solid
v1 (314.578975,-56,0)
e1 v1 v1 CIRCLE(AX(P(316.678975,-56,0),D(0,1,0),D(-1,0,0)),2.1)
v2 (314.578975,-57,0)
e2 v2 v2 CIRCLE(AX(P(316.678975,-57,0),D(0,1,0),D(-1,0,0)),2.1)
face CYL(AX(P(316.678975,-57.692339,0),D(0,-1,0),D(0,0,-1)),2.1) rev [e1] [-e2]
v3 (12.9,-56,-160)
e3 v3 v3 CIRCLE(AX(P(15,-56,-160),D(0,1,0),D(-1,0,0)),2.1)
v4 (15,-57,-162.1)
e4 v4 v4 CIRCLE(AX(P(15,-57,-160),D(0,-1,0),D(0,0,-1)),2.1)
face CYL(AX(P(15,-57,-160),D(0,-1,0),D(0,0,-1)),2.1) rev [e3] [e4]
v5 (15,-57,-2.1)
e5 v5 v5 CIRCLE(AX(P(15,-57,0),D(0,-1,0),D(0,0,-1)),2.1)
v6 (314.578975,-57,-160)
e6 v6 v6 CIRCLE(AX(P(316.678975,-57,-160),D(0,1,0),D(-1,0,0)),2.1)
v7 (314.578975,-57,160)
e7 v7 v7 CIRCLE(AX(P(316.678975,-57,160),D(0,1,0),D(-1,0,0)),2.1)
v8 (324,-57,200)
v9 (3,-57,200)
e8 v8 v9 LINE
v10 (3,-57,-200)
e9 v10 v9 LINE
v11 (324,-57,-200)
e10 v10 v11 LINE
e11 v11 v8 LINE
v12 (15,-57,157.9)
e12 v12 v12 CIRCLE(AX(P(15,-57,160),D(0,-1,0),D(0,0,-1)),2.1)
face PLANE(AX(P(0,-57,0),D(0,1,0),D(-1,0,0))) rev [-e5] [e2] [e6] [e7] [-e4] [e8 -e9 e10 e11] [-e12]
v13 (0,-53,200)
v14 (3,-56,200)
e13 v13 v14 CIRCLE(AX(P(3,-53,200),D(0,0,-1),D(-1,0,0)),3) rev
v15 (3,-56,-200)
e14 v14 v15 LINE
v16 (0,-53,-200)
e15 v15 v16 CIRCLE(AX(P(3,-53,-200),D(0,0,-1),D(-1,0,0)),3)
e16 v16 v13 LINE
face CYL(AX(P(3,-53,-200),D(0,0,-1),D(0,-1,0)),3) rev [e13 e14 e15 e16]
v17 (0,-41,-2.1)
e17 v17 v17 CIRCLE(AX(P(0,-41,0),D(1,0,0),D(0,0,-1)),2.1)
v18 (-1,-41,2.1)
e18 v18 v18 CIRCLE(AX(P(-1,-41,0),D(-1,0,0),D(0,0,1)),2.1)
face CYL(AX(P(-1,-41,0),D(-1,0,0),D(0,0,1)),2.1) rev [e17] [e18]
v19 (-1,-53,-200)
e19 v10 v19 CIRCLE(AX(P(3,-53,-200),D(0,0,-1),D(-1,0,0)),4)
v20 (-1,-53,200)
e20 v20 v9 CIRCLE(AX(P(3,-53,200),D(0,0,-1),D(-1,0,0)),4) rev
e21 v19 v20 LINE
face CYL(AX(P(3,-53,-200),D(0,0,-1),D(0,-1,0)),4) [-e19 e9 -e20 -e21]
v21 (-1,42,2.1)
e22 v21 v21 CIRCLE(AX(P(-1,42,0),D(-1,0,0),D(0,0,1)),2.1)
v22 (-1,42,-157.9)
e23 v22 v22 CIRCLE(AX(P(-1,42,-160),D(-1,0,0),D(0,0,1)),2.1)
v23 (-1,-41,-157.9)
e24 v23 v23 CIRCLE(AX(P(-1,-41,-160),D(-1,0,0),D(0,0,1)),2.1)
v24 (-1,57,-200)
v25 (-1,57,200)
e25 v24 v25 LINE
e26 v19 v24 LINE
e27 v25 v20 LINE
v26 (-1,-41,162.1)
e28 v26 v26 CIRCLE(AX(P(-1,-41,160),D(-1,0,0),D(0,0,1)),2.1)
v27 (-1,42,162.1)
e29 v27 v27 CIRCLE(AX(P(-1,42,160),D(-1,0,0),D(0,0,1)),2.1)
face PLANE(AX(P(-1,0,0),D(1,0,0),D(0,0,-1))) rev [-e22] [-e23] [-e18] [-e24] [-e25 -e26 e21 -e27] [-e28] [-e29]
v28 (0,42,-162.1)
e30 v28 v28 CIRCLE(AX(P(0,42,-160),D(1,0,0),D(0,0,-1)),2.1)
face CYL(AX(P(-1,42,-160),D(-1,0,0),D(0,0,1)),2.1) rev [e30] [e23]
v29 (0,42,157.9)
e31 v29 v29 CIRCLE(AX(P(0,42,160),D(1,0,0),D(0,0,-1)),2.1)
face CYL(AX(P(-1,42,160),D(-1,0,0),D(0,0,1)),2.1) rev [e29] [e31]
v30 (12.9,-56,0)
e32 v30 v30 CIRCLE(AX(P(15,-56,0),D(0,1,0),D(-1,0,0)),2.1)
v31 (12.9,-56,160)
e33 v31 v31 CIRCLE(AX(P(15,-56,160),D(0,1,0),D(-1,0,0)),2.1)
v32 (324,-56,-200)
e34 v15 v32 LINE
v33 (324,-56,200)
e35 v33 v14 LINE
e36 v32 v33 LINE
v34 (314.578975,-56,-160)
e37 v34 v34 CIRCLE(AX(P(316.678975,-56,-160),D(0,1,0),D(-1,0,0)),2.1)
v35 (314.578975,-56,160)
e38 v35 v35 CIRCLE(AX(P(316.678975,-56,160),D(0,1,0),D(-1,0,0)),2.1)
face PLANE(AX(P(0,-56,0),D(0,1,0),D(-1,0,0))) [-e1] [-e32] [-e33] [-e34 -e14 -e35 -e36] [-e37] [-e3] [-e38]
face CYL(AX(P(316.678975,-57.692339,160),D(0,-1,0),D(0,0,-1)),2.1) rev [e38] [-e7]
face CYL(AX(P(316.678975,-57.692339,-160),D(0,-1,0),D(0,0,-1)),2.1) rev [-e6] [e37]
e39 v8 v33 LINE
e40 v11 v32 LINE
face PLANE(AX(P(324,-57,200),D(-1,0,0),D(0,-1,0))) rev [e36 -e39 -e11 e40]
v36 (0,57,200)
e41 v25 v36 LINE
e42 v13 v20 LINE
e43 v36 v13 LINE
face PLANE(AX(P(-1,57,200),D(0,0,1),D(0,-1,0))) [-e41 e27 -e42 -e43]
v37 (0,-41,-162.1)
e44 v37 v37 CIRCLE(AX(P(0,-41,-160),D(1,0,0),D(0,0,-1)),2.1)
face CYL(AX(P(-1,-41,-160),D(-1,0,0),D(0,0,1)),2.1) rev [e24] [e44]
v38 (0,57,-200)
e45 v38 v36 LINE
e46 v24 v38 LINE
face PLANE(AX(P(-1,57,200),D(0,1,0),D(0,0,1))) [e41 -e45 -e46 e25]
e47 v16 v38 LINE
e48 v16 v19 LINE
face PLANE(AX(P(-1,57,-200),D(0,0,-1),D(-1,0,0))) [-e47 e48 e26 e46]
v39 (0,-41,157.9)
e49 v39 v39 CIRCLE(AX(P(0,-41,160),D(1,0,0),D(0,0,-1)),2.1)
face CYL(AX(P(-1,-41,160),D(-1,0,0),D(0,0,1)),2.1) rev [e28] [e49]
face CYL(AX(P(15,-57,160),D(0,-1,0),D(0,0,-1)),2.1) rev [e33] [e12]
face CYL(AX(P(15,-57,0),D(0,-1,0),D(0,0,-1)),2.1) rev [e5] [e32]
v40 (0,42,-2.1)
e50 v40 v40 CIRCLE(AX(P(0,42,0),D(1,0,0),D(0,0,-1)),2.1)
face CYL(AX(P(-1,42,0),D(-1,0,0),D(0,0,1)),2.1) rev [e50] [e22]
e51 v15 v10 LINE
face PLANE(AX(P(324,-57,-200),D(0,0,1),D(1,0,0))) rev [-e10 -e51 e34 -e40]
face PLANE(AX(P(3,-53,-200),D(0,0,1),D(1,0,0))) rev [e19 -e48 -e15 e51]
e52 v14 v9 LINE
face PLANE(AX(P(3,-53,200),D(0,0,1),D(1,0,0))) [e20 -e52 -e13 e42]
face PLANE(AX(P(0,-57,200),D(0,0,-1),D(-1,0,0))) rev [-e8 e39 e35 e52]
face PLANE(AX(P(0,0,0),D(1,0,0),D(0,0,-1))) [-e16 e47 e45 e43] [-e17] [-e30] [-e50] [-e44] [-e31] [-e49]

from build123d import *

# Parameters (mm, degrees)
SKETCH1_W                            = 400
SKETCH1_H                            = 114
BASE_FLANGE1_DEPTH                   = 1
EDGE_FLANGE1_STRIP_W                 = 10
EDGE_FLANGE1_STRIP_H                 = 1
EDGE_FLANGE1_STRIP_CUT_DEPTH         = 400
EDGE_FLANGE1_DEPTH                   = 400
F_4_2_START                          = -57
F_4_2_4_2_DIAMETER_HOLE1_OUTLINE_R   = 2.1
F_4_2_4_2_DIAMETER_HOLE1_DEPTH       = 1
F_4_2_START_2                        = -1
F_4_2_4_2_DIAMETER_HOLE1_2_OUTLINE_R = 2.1
F_4_2_4_2_DIAMETER_HOLE1_2_DEPTH     = 1


# Read off the part's stored shape, not the designer's step: Ø4.2 (4.2) Diameter Hole1
# Sheet-metal steps are written as plain solids
with BuildPart() as part:
    # Sketch1 → Base-Flange1 (new body)
    with BuildSketch(Plane(origin=(0, 0, 0), x_dir=(0, 0, -1), z_dir=(1, 0, 0))):
        Rectangle(SKETCH1_W, SKETCH1_H)
    extrude(amount=-BASE_FLANGE1_DEPTH)

    # Edge-Flange1 strip (across the edge) → Edge-Flange1 strip cut (cut)
    with BuildSketch(Plane(origin=(0, -57, 200), x_dir=(0, 1, 0), z_dir=(0, 0, -1))):
        with Locations((-1, -0.5)):
            Rectangle(EDGE_FLANGE1_STRIP_W, EDGE_FLANGE1_STRIP_H)
    extrude(amount=EDGE_FLANGE1_STRIP_CUT_DEPTH, mode=Mode.SUBTRACT)

    # Edge-Flange1 section (across the edge) → Edge-Flange1 (add)
    with BuildSketch(Plane(origin=(0, -57, 200), x_dir=(0, 1, 0), z_dir=(0, 0, -1))):
        with BuildLine():
            Line((0, 3), (0, 324))
            Line((0, 324), (1, 324))
            Line((1, 324), (1, 3))
            ThreePointArc((1, 3), (1.878679656, 0.878679656), (4, 0))
            Line((4, 0), (4, -1))
            ThreePointArc((4, -1), (1.171572875, 0.171572875), (0, 3))
        make_face()
    extrude(amount=EDGE_FLANGE1_DEPTH)

    # Ø4.2 (4.2) Diameter Hole1 outline → Ø4.2 (4.2) Diameter Hole1 (cut)
    with BuildSketch(Plane(origin=(0, 0, 0), x_dir=(1, 0, 0), z_dir=(0, 1, 0)).offset(F_4_2_START)):
        with Locations((15, 160)):
            Circle(F_4_2_4_2_DIAMETER_HOLE1_OUTLINE_R)
        with Locations((15, 0)):
            Circle(F_4_2_4_2_DIAMETER_HOLE1_OUTLINE_R)
        with Locations((15, -160)):
            Circle(F_4_2_4_2_DIAMETER_HOLE1_OUTLINE_R)
        with Locations((316.678974837, -160)):
            Circle(F_4_2_4_2_DIAMETER_HOLE1_OUTLINE_R)
        with Locations((316.678974837, 0)):
            Circle(F_4_2_4_2_DIAMETER_HOLE1_OUTLINE_R)
        with Locations((316.678974837, 160)):
            Circle(F_4_2_4_2_DIAMETER_HOLE1_OUTLINE_R)
    extrude(amount=F_4_2_4_2_DIAMETER_HOLE1_DEPTH, mode=Mode.SUBTRACT)

    # 4.2 _4.2_ Diameter Hole1 2 outline → 4.2 _4.2_ Diameter Hole1 2 (cut)
    with BuildSketch(Plane.YZ.offset(F_4_2_START_2)):
        with Locations((42, -160)):
            Circle(F_4_2_4_2_DIAMETER_HOLE1_2_OUTLINE_R)
        with Locations((42, 0)):
            Circle(F_4_2_4_2_DIAMETER_HOLE1_2_OUTLINE_R)
        with Locations((42, 160)):
            Circle(F_4_2_4_2_DIAMETER_HOLE1_2_OUTLINE_R)
        with Locations((-41, 160)):
            Circle(F_4_2_4_2_DIAMETER_HOLE1_2_OUTLINE_R)
        with Locations((-41, 0)):
            Circle(F_4_2_4_2_DIAMETER_HOLE1_2_OUTLINE_R)
        with Locations((-41, -160)):
            Circle(F_4_2_4_2_DIAMETER_HOLE1_2_OUTLINE_R)
    extrude(amount=F_4_2_4_2_DIAMETER_HOLE1_2_DEPTH, mode=Mode.SUBTRACT)


solid = part.part
